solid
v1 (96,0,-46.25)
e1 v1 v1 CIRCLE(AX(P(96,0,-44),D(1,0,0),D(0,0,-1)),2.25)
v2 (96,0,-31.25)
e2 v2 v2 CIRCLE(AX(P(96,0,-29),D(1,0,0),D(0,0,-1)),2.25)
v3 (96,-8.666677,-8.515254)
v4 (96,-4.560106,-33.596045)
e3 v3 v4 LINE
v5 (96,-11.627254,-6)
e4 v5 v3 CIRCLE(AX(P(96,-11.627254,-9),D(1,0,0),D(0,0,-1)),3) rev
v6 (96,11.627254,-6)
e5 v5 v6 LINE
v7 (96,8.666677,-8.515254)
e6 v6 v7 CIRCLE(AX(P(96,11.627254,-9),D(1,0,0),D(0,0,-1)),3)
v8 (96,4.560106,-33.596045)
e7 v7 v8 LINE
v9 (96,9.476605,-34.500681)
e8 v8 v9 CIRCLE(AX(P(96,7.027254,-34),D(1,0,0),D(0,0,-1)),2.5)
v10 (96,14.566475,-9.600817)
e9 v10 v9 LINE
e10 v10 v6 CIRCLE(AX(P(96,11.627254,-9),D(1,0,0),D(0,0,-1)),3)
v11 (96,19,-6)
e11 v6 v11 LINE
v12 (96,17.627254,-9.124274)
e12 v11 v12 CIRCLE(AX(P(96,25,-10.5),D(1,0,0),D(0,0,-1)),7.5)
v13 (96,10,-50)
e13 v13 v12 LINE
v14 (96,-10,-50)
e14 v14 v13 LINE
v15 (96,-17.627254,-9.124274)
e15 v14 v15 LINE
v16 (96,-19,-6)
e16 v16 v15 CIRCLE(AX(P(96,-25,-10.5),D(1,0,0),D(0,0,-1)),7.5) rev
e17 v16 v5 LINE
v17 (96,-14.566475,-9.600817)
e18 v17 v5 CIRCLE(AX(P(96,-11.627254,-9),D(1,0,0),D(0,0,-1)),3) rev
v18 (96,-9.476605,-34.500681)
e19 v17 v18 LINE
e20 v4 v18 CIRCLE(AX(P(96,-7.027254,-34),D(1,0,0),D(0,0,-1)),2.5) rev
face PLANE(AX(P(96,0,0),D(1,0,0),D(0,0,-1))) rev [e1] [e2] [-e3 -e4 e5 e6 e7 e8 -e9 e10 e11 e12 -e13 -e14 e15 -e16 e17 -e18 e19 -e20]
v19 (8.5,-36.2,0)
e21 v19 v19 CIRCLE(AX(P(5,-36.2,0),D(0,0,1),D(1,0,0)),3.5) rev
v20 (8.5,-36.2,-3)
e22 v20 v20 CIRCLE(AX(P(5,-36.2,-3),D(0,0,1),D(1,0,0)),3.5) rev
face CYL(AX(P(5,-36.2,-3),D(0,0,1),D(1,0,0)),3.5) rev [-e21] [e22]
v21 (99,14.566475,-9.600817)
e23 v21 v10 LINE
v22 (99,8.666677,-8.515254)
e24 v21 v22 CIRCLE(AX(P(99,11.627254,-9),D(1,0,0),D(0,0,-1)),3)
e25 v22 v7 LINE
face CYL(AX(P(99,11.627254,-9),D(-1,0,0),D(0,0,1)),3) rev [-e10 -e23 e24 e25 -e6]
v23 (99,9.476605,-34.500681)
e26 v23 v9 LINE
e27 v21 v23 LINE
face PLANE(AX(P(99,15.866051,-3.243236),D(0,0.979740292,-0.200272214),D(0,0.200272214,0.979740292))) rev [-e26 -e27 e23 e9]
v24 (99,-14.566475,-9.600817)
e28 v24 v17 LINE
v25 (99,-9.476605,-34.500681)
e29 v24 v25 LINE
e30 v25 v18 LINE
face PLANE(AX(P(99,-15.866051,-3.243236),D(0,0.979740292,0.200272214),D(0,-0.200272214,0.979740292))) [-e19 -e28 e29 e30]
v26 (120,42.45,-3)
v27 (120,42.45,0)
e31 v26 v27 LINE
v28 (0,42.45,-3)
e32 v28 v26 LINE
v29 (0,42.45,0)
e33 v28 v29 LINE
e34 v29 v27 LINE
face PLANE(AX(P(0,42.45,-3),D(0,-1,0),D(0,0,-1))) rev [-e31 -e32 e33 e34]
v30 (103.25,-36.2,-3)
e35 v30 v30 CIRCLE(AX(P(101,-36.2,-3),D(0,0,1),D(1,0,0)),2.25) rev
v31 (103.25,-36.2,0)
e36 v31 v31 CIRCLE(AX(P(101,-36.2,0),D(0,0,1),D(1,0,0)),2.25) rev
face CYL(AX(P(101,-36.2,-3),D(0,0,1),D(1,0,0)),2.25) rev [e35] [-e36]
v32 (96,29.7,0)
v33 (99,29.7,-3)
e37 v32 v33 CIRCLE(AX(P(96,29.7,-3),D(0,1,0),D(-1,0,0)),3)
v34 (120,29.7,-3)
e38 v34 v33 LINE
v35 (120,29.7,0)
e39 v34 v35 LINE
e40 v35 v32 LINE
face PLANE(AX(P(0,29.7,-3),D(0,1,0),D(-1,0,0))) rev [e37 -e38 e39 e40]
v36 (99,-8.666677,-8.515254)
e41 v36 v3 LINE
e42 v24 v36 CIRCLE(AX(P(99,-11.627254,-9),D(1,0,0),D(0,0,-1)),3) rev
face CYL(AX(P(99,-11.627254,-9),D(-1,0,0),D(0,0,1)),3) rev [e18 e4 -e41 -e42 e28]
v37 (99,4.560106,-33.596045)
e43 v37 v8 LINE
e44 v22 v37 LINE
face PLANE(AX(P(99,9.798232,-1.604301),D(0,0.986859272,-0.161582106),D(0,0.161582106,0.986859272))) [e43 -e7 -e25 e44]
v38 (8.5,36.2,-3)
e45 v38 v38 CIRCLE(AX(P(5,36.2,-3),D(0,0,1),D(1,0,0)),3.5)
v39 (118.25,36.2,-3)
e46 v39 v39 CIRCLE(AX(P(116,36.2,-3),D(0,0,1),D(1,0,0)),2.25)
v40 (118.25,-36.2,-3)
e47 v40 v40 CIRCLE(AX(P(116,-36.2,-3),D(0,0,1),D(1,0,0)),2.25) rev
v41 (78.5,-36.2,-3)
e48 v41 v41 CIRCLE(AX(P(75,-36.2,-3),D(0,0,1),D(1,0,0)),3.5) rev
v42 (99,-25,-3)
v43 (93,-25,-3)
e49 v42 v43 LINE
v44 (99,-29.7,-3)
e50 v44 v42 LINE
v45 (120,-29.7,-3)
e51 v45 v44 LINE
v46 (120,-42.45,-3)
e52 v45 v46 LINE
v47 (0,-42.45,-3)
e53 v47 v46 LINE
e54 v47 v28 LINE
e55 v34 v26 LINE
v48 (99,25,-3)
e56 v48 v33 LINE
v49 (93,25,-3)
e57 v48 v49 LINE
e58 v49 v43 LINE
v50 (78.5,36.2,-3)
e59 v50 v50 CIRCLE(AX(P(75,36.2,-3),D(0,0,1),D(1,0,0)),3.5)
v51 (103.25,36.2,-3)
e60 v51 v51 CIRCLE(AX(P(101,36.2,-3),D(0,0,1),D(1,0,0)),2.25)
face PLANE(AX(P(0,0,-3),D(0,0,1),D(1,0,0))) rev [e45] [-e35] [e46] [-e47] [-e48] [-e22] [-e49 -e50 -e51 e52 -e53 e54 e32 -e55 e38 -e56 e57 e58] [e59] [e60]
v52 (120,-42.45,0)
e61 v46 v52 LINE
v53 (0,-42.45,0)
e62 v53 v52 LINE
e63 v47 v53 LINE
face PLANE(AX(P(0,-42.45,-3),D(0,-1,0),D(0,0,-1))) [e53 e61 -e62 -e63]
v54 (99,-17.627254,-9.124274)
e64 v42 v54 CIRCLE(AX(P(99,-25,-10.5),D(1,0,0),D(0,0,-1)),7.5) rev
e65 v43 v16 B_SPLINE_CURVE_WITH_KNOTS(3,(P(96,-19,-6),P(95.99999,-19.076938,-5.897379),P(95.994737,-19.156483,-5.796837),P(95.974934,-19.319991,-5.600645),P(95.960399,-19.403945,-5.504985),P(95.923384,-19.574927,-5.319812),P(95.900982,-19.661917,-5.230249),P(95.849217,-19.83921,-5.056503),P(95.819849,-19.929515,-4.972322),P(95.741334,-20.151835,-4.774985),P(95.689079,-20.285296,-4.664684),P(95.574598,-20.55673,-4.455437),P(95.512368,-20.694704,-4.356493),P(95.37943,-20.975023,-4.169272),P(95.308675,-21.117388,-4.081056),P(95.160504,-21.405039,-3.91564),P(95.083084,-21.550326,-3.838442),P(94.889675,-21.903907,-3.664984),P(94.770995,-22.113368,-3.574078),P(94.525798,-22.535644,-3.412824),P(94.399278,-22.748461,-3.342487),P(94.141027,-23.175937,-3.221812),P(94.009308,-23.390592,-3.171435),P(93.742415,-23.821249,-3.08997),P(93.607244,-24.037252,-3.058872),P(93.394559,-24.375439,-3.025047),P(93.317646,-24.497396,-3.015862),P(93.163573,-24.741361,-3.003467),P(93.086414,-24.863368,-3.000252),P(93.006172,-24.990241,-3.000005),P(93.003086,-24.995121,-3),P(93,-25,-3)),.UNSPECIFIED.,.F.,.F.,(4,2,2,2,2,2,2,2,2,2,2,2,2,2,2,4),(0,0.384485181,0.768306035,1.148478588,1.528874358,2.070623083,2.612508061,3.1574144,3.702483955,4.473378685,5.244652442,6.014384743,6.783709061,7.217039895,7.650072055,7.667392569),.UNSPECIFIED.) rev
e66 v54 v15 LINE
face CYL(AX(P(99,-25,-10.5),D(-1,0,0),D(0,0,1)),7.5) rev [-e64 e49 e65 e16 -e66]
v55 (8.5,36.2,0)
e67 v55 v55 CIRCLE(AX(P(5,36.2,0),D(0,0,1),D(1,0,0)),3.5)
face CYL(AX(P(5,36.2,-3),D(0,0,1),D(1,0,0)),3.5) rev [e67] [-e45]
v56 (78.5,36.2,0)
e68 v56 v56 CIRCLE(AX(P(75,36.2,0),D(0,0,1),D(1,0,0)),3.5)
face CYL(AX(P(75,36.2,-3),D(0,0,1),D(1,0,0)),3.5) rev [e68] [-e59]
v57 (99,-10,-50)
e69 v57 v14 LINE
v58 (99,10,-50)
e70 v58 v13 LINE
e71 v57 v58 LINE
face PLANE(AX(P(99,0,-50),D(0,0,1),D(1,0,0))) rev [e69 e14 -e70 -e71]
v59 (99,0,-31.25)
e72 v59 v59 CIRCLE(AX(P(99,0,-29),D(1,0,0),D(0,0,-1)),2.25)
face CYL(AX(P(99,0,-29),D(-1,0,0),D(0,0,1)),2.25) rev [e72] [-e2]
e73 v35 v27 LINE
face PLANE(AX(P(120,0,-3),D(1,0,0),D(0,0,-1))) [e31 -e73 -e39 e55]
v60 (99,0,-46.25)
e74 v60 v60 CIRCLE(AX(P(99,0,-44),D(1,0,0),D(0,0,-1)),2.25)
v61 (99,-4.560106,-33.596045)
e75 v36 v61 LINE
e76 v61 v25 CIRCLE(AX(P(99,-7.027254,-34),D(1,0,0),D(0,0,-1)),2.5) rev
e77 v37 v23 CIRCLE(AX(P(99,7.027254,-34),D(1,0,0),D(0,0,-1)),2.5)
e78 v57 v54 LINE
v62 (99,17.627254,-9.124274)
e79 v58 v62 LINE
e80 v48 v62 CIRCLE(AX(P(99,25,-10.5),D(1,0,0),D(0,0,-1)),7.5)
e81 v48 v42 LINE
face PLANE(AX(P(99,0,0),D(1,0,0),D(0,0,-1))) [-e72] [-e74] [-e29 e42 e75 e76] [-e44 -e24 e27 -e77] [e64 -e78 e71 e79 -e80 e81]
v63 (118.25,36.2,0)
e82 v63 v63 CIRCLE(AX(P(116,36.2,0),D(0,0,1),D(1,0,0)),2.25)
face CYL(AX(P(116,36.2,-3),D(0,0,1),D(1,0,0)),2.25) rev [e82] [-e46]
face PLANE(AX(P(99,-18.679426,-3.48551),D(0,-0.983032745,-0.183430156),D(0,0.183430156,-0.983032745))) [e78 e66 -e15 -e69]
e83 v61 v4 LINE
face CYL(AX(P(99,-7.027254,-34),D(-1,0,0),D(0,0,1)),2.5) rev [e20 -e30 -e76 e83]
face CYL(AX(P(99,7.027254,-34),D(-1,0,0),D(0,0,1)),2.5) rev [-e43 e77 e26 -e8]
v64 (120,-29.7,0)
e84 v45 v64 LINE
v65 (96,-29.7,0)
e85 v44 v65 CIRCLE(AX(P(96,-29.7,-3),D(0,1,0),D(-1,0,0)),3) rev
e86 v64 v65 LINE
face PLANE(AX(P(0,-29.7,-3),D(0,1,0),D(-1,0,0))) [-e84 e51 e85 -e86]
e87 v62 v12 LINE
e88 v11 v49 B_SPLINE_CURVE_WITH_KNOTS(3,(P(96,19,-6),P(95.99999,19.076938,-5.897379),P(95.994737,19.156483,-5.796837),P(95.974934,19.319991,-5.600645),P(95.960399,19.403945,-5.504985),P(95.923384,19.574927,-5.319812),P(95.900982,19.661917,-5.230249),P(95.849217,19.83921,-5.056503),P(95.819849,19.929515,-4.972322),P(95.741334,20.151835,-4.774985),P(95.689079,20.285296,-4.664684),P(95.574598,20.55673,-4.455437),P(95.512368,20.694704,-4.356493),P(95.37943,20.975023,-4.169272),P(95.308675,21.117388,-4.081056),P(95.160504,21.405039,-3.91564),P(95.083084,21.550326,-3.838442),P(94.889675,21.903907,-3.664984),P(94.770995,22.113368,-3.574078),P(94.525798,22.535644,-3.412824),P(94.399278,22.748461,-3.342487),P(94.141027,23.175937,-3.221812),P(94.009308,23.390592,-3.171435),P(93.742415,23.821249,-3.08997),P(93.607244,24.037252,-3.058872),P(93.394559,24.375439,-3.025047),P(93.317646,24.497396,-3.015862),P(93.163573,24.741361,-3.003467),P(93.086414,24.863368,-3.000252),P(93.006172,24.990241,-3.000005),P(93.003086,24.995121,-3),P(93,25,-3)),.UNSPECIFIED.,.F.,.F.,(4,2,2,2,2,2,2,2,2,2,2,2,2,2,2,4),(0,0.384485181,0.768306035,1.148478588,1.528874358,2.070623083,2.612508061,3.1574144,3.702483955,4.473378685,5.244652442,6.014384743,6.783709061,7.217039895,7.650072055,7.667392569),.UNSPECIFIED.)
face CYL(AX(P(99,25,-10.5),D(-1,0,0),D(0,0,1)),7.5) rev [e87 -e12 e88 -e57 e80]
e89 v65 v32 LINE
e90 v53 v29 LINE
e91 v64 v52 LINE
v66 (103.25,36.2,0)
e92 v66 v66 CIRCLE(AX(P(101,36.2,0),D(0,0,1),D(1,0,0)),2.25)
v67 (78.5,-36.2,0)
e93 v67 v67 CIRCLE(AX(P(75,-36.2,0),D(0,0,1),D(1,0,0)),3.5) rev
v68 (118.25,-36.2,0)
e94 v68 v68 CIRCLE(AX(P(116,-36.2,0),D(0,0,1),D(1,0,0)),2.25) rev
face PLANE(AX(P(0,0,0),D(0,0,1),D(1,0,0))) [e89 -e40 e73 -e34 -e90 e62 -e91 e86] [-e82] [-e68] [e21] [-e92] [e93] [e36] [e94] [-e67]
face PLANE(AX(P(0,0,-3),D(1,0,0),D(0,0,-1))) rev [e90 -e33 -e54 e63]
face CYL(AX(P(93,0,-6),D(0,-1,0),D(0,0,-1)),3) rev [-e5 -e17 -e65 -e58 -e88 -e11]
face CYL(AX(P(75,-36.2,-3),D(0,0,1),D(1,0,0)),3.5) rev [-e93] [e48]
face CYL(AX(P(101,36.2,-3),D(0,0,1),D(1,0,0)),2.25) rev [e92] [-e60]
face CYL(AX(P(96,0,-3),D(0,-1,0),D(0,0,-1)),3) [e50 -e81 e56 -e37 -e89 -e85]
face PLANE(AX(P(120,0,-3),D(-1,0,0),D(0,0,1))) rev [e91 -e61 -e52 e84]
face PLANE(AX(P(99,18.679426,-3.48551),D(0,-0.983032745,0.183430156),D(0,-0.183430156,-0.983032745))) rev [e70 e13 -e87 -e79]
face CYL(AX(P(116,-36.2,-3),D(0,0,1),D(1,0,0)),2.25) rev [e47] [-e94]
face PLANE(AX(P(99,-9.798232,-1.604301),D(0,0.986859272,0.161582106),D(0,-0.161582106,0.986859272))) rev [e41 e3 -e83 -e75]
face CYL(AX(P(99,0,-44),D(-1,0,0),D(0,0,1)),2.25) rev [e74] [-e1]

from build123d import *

# Parameters (mm, degrees)
SKETCH1_R           = 3.5
SKETCH1_R_2         = 2.25
BOSS_EXTRUDE1_DEPTH = 3
SKETCH3_R           = 2.25
BOSS_EXTRUDE2_DEPTH = 3
FILLET1_R           = 3
FILLET2_R           = 3


with BuildPart() as part:
    # Sketch1 → Boss-Extrude1 (new body)
    with BuildSketch(Plane.XY):
        Polygon((120, 29.7), (96, 29.7), (96, -29.7), (120, -29.7), (120, -42.45), (0, -42.45), (0, 42.45), (120, 42.45), align=None)
        with Locations((5, 36.2)):
            Circle(SKETCH1_R, mode=Mode.SUBTRACT)
        with Locations((75, 36.2)):
            Circle(SKETCH1_R, mode=Mode.SUBTRACT)
        with Locations((5, -36.2)):
            Circle(SKETCH1_R, mode=Mode.SUBTRACT)
        with Locations((75, -36.2)):
            Circle(SKETCH1_R, mode=Mode.SUBTRACT)
        with Locations((116, 36.2)):
            Circle(SKETCH1_R_2, mode=Mode.SUBTRACT)
        with Locations((101, 36.2)):
            Circle(SKETCH1_R_2, mode=Mode.SUBTRACT)
        with Locations((101, -36.2)):
            Circle(SKETCH1_R_2, mode=Mode.SUBTRACT)
        with Locations((116, -36.2)):
            Circle(SKETCH1_R_2, mode=Mode.SUBTRACT)
    extrude(amount=-BOSS_EXTRUDE1_DEPTH)

    # Sketch3 → Boss-Extrude2 (add)
    with BuildSketch(Plane(origin=(96, 0, 0), x_dir=(0, 0, -1), z_dir=(1, 0, 0))):
        with BuildLine():
            Line((0, 29.7), (0, -29.7))
            Line((0, -29.7), (3, -29.7))
            Line((3, -29.7), (3, -25))
            ThreePointArc((3, -25), (4.730773609, -20.207711731), (9.124273828, -17.627254412))
            Line((9.124273828, -17.627254412), (50, -10))
            Line((50, -10), (50, 10))
            Line((50, 10), (9.124273828, 17.627254412))
            ThreePointArc((9.124273828, 17.627254412), (4.730773609, 20.207711731), (3, 25))
            Line((3, 25), (3, 29.7))
            Line((3, 29.7), (0, 29.7))
        make_face()
        with Locations((29, 0)):
            Circle(SKETCH3_R, mode=Mode.SUBTRACT)
        with Locations((44, 0)):
            Circle(SKETCH3_R, mode=Mode.SUBTRACT)
        with BuildLine():
            Line((9.600816641, 14.566475289), (34.500680534, 9.476605143))
            ThreePointArc((34.500680534, 9.476605143), (36.458725143, 6.574848986), (33.596044735, 4.560106232))
            Line((33.596044735, 4.560106232), (8.515253682, 8.666676596))
            ThreePointArc((8.515253682, 8.666676596), (6.049529828, 12.170140924), (9.600816641, 14.566475289))
        make_face(mode=Mode.SUBTRACT)
        with BuildLine():
            ThreePointArc((33.596044735, -4.560106232), (36.458725143, -6.574848986), (34.500680534, -9.476605143))
            Line((34.500680534, -9.476605143), (9.600816641, -14.566475289))
            ThreePointArc((9.600816641, -14.566475289), (6.049529828, -12.170140924), (8.515253682, -8.666676596))
            Line((8.515253682, -8.666676596), (33.596044735, -4.560106232))
        make_face(mode=Mode.SUBTRACT)
    extrude(amount=BOSS_EXTRUDE2_DEPTH)

    # Fillet1
    fillet1_edges = [part.edges().sort_by_distance(p)[0] for p in [
        (99, 0, 0),
    ]]
    fillet(fillet1_edges, radius=FILLET1_R - 0.0001)  # a hair under: the kernel refuses the full size

    # Fillet2
    fillet2_edges = [part.edges().sort_by_distance(p)[0] for p in [
        (96, 0, -3),
    ]]
    fillet(fillet2_edges, radius=FILLET2_R - 0.0001)  # a hair under: the kernel refuses the full size


solid = part.part
